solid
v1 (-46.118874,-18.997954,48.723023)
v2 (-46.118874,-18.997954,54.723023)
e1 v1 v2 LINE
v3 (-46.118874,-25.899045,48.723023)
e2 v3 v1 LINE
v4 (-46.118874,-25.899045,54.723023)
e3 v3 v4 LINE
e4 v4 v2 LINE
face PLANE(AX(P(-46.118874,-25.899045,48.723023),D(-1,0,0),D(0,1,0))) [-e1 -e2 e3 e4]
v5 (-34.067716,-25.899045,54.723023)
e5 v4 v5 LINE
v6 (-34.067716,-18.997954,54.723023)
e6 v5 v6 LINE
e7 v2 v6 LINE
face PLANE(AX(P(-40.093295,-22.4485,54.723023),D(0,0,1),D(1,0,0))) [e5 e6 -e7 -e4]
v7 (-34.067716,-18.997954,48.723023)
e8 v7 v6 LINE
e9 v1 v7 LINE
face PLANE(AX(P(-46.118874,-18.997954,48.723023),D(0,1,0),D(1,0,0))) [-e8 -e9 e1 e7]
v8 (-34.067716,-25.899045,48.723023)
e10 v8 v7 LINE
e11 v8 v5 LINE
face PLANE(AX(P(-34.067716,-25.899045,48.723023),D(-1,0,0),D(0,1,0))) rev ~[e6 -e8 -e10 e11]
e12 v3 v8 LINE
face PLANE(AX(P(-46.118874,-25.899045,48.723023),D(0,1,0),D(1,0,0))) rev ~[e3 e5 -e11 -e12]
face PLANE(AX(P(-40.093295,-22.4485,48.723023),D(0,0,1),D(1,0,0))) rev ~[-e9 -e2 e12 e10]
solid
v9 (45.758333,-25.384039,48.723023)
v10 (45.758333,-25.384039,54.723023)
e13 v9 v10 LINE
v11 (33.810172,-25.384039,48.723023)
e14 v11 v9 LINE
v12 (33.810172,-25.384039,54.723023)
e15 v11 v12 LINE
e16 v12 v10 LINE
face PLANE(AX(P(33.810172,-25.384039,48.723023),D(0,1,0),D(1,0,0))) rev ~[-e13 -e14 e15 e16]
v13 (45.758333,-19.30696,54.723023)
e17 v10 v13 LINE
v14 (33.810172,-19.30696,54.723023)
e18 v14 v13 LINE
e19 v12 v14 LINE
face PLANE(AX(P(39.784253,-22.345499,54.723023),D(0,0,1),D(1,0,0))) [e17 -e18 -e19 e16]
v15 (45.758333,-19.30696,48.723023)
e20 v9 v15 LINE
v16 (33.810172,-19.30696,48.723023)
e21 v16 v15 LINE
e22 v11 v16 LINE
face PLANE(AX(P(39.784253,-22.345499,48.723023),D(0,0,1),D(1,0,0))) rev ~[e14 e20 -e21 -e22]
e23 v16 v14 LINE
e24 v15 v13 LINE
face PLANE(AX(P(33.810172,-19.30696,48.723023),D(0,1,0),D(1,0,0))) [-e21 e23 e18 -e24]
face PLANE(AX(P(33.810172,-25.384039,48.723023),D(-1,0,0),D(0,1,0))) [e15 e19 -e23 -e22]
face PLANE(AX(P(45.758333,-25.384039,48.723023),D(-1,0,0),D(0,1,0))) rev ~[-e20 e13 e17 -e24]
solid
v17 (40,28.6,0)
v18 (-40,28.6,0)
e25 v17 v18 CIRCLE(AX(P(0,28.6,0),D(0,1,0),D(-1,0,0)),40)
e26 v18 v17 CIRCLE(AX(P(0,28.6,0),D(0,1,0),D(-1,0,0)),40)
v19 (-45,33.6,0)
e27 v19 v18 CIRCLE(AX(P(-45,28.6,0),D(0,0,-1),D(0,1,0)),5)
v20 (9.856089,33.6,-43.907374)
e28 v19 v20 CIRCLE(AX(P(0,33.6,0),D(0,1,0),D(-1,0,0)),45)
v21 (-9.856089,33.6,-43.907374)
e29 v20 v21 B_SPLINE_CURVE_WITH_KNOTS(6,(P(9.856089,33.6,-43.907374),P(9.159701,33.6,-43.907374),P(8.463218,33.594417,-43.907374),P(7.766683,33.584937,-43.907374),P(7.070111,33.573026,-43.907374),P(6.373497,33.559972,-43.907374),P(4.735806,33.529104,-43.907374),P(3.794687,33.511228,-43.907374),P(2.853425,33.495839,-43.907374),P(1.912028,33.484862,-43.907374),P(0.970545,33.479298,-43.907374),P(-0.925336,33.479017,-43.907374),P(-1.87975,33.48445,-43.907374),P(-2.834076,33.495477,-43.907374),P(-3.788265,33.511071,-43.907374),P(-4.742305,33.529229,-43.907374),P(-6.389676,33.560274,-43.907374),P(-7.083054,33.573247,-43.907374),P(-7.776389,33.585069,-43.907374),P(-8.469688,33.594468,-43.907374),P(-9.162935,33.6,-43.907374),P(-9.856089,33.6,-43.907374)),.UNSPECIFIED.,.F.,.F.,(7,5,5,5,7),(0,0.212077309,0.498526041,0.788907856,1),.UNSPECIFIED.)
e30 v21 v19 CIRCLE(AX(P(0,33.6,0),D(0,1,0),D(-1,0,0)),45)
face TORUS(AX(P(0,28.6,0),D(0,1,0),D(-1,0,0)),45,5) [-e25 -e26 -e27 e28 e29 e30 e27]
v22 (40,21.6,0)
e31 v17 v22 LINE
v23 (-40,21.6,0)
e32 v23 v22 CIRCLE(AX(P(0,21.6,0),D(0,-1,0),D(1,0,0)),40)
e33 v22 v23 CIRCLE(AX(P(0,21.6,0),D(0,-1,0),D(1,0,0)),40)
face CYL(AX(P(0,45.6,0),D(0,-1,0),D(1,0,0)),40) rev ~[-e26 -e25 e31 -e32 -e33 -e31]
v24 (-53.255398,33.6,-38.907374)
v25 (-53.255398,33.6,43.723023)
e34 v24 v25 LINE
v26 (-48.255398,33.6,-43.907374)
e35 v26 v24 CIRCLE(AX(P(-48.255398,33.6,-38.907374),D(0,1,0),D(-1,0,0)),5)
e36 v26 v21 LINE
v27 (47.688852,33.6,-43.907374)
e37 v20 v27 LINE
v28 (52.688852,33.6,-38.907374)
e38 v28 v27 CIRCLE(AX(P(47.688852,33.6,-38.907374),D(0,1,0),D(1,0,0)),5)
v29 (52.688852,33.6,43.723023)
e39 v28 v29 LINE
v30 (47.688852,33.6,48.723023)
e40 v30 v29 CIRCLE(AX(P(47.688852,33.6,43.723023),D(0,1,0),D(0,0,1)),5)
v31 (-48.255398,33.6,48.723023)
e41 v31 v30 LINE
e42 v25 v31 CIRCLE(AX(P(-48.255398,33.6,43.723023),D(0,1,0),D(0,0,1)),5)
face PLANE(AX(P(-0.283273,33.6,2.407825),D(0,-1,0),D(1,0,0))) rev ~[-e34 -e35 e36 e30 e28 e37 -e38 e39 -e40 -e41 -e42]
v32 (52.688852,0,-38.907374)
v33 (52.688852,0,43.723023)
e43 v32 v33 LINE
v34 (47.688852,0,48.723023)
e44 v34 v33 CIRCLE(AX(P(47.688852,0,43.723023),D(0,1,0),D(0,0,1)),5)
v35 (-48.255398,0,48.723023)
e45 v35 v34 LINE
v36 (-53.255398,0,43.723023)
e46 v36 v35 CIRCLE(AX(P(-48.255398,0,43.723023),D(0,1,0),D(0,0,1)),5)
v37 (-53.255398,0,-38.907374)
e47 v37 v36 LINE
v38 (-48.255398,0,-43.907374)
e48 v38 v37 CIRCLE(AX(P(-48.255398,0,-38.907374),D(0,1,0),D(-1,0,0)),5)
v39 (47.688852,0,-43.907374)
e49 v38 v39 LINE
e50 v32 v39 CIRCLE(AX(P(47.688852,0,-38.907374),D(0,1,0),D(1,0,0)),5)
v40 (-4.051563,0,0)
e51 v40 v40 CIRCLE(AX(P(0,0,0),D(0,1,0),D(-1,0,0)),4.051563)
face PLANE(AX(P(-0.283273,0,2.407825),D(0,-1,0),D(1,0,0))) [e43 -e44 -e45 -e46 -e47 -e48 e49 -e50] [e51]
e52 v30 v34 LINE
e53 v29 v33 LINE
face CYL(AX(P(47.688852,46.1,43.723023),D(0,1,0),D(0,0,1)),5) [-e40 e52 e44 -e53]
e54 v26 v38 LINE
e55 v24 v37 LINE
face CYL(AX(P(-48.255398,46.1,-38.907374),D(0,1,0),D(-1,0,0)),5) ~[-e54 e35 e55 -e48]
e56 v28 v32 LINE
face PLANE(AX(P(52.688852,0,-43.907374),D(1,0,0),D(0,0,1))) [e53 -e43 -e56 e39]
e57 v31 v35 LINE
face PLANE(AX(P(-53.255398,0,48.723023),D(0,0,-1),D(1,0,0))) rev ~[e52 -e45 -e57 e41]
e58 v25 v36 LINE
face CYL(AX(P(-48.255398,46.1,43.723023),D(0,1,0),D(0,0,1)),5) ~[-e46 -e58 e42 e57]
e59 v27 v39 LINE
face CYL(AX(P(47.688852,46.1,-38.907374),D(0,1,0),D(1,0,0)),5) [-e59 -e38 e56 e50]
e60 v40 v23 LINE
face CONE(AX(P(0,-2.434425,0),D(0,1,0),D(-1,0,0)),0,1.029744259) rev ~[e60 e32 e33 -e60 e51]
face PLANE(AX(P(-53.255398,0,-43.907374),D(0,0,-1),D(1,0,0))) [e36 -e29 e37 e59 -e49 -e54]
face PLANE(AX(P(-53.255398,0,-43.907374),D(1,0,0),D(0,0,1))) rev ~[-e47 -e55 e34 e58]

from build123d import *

# Parameters (mm, degrees)
F0_W        = 105.944249779
F0_H        = 92.6303975284
F1_DEPTH    = 33.6
F3_D        = 80
F3_DEPTH    = 12
F3_TIP      = 24.0344247611
F4_T1_DEPTH = 58.6
F5_W        = 12.0511576533
F5_H        = 6.9010909647
F6_DEPTH    = 6
F5_W_2      = 11.9481608272
F5_H_2      = 6.0770791024


# Not quite as in the source:
# - a fillet or chamfer that OpenCascade refuses, or shapes differently, is made with other operations: its cross-section is extruded or revolved along the edge and cut away or added


with BuildPart() as f1:
    # F0 (on Front) → F1 (new body)
    with BuildSketch(Plane.XZ):
        with Locations((-0.2832729369, 2.4078246206)):
            Rectangle(F0_W, F0_H)
    extrude(amount=-F1_DEPTH)

    # F3
    with Locations(Plane(origin=(0, 33.6, 0), x_dir=(-1, 0, 0), z_dir=(0, 1, 0))):
        with Locations((0, 0)):
            Hole(F3_D / 2, depth=F3_DEPTH)
            with Locations((0, 0, -(F3_DEPTH + F3_TIP / 2))):  # 118° drill point
                Cone(0, F3_D / 2, F3_TIP, mode=Mode.SUBTRACT)

    # F4: fillet of radius 5 on 5 edges, made by hand

    # F4_s2 → F4_t1 (cut)
    with BuildSketch(Plane.XZ.offset(-46.1)):
        with BuildLine():
            ThreePointArc((47.6888519526, 48.7230233848), (51.2243858585, 47.2585572907), (52.6888519526, 43.7230233848))
            Line((52.6888519526, 43.7230233848), (52.6888519526, 48.7230233848))
            Line((52.6888519526, 48.7230233848), (47.6888519526, 48.7230233848))
        make_face()
        with BuildLine():
            ThreePointArc((-48.2553978264, 48.7230233848), (-51.7909317324, 47.2585572907), (-53.2553978264, 43.7230233848))
            Line((-53.2553978264, 43.7230233848), (-53.2553978264, 48.7230233848))
            Line((-53.2553978264, 48.7230233848), (-48.2553978264, 48.7230233848))
        make_face()
        with BuildLine():
            ThreePointArc((-53.2553978264, -38.9073741436), (-51.7909317324, -42.4429080495), (-48.2553978264, -43.9073741436))
            Line((-48.2553978264, -43.9073741436), (-53.2553978264, -43.9073741436))
            Line((-53.2553978264, -43.9073741436), (-53.2553978264, -38.9073741436))
        make_face()
        with BuildLine():
            ThreePointArc((52.6888519526, -38.9073741436), (51.2243858585, -42.4429080495), (47.6888519526, -43.9073741436))
            Line((47.6888519526, -43.9073741436), (52.6888519526, -43.9073741436))
            Line((52.6888519526, -43.9073741436), (52.6888519526, -38.9073741436))
        make_face()
    extrude(amount=F4_T1_DEPTH, mode=Mode.SUBTRACT)

    # F4_s3 → F4_t4 (revolve, cut)
    with BuildSketch(Plane.XY):
        with BuildLine():
            ThreePointArc((-45, 33.6), (-41.4644660941, 32.1355339059), (-40, 28.6))
            Line((-40, 28.6), (-40, 33.6))
            Line((-40, 33.6), (-45, 33.6))
        make_face()
    revolve(axis=Axis((0, 33.6, 0), (0, 1, 0)), mode=Mode.SUBTRACT)


with BuildPart() as f6:
    # F5 (on face) → F6 (new body)
    with BuildSketch(Plane.XY.offset(48.7230233848)):
        with Locations((-40.0932952762, -22.448499687)):
            Rectangle(F5_W, F5_H)
    extrude(amount=F6_DEPTH)


with BuildPart() as f6b:
    # F5 (on face) → F6, piece 2 (new body)
    with BuildSketch(Plane.XY.offset(48.7230233848)):
        with Locations((39.7842526436, -22.3454991356)):
            Rectangle(F5_W_2, F5_H_2)
    extrude(amount=F6_DEPTH)


solid = Compound([f1.part, f6.part, f6b.part])
